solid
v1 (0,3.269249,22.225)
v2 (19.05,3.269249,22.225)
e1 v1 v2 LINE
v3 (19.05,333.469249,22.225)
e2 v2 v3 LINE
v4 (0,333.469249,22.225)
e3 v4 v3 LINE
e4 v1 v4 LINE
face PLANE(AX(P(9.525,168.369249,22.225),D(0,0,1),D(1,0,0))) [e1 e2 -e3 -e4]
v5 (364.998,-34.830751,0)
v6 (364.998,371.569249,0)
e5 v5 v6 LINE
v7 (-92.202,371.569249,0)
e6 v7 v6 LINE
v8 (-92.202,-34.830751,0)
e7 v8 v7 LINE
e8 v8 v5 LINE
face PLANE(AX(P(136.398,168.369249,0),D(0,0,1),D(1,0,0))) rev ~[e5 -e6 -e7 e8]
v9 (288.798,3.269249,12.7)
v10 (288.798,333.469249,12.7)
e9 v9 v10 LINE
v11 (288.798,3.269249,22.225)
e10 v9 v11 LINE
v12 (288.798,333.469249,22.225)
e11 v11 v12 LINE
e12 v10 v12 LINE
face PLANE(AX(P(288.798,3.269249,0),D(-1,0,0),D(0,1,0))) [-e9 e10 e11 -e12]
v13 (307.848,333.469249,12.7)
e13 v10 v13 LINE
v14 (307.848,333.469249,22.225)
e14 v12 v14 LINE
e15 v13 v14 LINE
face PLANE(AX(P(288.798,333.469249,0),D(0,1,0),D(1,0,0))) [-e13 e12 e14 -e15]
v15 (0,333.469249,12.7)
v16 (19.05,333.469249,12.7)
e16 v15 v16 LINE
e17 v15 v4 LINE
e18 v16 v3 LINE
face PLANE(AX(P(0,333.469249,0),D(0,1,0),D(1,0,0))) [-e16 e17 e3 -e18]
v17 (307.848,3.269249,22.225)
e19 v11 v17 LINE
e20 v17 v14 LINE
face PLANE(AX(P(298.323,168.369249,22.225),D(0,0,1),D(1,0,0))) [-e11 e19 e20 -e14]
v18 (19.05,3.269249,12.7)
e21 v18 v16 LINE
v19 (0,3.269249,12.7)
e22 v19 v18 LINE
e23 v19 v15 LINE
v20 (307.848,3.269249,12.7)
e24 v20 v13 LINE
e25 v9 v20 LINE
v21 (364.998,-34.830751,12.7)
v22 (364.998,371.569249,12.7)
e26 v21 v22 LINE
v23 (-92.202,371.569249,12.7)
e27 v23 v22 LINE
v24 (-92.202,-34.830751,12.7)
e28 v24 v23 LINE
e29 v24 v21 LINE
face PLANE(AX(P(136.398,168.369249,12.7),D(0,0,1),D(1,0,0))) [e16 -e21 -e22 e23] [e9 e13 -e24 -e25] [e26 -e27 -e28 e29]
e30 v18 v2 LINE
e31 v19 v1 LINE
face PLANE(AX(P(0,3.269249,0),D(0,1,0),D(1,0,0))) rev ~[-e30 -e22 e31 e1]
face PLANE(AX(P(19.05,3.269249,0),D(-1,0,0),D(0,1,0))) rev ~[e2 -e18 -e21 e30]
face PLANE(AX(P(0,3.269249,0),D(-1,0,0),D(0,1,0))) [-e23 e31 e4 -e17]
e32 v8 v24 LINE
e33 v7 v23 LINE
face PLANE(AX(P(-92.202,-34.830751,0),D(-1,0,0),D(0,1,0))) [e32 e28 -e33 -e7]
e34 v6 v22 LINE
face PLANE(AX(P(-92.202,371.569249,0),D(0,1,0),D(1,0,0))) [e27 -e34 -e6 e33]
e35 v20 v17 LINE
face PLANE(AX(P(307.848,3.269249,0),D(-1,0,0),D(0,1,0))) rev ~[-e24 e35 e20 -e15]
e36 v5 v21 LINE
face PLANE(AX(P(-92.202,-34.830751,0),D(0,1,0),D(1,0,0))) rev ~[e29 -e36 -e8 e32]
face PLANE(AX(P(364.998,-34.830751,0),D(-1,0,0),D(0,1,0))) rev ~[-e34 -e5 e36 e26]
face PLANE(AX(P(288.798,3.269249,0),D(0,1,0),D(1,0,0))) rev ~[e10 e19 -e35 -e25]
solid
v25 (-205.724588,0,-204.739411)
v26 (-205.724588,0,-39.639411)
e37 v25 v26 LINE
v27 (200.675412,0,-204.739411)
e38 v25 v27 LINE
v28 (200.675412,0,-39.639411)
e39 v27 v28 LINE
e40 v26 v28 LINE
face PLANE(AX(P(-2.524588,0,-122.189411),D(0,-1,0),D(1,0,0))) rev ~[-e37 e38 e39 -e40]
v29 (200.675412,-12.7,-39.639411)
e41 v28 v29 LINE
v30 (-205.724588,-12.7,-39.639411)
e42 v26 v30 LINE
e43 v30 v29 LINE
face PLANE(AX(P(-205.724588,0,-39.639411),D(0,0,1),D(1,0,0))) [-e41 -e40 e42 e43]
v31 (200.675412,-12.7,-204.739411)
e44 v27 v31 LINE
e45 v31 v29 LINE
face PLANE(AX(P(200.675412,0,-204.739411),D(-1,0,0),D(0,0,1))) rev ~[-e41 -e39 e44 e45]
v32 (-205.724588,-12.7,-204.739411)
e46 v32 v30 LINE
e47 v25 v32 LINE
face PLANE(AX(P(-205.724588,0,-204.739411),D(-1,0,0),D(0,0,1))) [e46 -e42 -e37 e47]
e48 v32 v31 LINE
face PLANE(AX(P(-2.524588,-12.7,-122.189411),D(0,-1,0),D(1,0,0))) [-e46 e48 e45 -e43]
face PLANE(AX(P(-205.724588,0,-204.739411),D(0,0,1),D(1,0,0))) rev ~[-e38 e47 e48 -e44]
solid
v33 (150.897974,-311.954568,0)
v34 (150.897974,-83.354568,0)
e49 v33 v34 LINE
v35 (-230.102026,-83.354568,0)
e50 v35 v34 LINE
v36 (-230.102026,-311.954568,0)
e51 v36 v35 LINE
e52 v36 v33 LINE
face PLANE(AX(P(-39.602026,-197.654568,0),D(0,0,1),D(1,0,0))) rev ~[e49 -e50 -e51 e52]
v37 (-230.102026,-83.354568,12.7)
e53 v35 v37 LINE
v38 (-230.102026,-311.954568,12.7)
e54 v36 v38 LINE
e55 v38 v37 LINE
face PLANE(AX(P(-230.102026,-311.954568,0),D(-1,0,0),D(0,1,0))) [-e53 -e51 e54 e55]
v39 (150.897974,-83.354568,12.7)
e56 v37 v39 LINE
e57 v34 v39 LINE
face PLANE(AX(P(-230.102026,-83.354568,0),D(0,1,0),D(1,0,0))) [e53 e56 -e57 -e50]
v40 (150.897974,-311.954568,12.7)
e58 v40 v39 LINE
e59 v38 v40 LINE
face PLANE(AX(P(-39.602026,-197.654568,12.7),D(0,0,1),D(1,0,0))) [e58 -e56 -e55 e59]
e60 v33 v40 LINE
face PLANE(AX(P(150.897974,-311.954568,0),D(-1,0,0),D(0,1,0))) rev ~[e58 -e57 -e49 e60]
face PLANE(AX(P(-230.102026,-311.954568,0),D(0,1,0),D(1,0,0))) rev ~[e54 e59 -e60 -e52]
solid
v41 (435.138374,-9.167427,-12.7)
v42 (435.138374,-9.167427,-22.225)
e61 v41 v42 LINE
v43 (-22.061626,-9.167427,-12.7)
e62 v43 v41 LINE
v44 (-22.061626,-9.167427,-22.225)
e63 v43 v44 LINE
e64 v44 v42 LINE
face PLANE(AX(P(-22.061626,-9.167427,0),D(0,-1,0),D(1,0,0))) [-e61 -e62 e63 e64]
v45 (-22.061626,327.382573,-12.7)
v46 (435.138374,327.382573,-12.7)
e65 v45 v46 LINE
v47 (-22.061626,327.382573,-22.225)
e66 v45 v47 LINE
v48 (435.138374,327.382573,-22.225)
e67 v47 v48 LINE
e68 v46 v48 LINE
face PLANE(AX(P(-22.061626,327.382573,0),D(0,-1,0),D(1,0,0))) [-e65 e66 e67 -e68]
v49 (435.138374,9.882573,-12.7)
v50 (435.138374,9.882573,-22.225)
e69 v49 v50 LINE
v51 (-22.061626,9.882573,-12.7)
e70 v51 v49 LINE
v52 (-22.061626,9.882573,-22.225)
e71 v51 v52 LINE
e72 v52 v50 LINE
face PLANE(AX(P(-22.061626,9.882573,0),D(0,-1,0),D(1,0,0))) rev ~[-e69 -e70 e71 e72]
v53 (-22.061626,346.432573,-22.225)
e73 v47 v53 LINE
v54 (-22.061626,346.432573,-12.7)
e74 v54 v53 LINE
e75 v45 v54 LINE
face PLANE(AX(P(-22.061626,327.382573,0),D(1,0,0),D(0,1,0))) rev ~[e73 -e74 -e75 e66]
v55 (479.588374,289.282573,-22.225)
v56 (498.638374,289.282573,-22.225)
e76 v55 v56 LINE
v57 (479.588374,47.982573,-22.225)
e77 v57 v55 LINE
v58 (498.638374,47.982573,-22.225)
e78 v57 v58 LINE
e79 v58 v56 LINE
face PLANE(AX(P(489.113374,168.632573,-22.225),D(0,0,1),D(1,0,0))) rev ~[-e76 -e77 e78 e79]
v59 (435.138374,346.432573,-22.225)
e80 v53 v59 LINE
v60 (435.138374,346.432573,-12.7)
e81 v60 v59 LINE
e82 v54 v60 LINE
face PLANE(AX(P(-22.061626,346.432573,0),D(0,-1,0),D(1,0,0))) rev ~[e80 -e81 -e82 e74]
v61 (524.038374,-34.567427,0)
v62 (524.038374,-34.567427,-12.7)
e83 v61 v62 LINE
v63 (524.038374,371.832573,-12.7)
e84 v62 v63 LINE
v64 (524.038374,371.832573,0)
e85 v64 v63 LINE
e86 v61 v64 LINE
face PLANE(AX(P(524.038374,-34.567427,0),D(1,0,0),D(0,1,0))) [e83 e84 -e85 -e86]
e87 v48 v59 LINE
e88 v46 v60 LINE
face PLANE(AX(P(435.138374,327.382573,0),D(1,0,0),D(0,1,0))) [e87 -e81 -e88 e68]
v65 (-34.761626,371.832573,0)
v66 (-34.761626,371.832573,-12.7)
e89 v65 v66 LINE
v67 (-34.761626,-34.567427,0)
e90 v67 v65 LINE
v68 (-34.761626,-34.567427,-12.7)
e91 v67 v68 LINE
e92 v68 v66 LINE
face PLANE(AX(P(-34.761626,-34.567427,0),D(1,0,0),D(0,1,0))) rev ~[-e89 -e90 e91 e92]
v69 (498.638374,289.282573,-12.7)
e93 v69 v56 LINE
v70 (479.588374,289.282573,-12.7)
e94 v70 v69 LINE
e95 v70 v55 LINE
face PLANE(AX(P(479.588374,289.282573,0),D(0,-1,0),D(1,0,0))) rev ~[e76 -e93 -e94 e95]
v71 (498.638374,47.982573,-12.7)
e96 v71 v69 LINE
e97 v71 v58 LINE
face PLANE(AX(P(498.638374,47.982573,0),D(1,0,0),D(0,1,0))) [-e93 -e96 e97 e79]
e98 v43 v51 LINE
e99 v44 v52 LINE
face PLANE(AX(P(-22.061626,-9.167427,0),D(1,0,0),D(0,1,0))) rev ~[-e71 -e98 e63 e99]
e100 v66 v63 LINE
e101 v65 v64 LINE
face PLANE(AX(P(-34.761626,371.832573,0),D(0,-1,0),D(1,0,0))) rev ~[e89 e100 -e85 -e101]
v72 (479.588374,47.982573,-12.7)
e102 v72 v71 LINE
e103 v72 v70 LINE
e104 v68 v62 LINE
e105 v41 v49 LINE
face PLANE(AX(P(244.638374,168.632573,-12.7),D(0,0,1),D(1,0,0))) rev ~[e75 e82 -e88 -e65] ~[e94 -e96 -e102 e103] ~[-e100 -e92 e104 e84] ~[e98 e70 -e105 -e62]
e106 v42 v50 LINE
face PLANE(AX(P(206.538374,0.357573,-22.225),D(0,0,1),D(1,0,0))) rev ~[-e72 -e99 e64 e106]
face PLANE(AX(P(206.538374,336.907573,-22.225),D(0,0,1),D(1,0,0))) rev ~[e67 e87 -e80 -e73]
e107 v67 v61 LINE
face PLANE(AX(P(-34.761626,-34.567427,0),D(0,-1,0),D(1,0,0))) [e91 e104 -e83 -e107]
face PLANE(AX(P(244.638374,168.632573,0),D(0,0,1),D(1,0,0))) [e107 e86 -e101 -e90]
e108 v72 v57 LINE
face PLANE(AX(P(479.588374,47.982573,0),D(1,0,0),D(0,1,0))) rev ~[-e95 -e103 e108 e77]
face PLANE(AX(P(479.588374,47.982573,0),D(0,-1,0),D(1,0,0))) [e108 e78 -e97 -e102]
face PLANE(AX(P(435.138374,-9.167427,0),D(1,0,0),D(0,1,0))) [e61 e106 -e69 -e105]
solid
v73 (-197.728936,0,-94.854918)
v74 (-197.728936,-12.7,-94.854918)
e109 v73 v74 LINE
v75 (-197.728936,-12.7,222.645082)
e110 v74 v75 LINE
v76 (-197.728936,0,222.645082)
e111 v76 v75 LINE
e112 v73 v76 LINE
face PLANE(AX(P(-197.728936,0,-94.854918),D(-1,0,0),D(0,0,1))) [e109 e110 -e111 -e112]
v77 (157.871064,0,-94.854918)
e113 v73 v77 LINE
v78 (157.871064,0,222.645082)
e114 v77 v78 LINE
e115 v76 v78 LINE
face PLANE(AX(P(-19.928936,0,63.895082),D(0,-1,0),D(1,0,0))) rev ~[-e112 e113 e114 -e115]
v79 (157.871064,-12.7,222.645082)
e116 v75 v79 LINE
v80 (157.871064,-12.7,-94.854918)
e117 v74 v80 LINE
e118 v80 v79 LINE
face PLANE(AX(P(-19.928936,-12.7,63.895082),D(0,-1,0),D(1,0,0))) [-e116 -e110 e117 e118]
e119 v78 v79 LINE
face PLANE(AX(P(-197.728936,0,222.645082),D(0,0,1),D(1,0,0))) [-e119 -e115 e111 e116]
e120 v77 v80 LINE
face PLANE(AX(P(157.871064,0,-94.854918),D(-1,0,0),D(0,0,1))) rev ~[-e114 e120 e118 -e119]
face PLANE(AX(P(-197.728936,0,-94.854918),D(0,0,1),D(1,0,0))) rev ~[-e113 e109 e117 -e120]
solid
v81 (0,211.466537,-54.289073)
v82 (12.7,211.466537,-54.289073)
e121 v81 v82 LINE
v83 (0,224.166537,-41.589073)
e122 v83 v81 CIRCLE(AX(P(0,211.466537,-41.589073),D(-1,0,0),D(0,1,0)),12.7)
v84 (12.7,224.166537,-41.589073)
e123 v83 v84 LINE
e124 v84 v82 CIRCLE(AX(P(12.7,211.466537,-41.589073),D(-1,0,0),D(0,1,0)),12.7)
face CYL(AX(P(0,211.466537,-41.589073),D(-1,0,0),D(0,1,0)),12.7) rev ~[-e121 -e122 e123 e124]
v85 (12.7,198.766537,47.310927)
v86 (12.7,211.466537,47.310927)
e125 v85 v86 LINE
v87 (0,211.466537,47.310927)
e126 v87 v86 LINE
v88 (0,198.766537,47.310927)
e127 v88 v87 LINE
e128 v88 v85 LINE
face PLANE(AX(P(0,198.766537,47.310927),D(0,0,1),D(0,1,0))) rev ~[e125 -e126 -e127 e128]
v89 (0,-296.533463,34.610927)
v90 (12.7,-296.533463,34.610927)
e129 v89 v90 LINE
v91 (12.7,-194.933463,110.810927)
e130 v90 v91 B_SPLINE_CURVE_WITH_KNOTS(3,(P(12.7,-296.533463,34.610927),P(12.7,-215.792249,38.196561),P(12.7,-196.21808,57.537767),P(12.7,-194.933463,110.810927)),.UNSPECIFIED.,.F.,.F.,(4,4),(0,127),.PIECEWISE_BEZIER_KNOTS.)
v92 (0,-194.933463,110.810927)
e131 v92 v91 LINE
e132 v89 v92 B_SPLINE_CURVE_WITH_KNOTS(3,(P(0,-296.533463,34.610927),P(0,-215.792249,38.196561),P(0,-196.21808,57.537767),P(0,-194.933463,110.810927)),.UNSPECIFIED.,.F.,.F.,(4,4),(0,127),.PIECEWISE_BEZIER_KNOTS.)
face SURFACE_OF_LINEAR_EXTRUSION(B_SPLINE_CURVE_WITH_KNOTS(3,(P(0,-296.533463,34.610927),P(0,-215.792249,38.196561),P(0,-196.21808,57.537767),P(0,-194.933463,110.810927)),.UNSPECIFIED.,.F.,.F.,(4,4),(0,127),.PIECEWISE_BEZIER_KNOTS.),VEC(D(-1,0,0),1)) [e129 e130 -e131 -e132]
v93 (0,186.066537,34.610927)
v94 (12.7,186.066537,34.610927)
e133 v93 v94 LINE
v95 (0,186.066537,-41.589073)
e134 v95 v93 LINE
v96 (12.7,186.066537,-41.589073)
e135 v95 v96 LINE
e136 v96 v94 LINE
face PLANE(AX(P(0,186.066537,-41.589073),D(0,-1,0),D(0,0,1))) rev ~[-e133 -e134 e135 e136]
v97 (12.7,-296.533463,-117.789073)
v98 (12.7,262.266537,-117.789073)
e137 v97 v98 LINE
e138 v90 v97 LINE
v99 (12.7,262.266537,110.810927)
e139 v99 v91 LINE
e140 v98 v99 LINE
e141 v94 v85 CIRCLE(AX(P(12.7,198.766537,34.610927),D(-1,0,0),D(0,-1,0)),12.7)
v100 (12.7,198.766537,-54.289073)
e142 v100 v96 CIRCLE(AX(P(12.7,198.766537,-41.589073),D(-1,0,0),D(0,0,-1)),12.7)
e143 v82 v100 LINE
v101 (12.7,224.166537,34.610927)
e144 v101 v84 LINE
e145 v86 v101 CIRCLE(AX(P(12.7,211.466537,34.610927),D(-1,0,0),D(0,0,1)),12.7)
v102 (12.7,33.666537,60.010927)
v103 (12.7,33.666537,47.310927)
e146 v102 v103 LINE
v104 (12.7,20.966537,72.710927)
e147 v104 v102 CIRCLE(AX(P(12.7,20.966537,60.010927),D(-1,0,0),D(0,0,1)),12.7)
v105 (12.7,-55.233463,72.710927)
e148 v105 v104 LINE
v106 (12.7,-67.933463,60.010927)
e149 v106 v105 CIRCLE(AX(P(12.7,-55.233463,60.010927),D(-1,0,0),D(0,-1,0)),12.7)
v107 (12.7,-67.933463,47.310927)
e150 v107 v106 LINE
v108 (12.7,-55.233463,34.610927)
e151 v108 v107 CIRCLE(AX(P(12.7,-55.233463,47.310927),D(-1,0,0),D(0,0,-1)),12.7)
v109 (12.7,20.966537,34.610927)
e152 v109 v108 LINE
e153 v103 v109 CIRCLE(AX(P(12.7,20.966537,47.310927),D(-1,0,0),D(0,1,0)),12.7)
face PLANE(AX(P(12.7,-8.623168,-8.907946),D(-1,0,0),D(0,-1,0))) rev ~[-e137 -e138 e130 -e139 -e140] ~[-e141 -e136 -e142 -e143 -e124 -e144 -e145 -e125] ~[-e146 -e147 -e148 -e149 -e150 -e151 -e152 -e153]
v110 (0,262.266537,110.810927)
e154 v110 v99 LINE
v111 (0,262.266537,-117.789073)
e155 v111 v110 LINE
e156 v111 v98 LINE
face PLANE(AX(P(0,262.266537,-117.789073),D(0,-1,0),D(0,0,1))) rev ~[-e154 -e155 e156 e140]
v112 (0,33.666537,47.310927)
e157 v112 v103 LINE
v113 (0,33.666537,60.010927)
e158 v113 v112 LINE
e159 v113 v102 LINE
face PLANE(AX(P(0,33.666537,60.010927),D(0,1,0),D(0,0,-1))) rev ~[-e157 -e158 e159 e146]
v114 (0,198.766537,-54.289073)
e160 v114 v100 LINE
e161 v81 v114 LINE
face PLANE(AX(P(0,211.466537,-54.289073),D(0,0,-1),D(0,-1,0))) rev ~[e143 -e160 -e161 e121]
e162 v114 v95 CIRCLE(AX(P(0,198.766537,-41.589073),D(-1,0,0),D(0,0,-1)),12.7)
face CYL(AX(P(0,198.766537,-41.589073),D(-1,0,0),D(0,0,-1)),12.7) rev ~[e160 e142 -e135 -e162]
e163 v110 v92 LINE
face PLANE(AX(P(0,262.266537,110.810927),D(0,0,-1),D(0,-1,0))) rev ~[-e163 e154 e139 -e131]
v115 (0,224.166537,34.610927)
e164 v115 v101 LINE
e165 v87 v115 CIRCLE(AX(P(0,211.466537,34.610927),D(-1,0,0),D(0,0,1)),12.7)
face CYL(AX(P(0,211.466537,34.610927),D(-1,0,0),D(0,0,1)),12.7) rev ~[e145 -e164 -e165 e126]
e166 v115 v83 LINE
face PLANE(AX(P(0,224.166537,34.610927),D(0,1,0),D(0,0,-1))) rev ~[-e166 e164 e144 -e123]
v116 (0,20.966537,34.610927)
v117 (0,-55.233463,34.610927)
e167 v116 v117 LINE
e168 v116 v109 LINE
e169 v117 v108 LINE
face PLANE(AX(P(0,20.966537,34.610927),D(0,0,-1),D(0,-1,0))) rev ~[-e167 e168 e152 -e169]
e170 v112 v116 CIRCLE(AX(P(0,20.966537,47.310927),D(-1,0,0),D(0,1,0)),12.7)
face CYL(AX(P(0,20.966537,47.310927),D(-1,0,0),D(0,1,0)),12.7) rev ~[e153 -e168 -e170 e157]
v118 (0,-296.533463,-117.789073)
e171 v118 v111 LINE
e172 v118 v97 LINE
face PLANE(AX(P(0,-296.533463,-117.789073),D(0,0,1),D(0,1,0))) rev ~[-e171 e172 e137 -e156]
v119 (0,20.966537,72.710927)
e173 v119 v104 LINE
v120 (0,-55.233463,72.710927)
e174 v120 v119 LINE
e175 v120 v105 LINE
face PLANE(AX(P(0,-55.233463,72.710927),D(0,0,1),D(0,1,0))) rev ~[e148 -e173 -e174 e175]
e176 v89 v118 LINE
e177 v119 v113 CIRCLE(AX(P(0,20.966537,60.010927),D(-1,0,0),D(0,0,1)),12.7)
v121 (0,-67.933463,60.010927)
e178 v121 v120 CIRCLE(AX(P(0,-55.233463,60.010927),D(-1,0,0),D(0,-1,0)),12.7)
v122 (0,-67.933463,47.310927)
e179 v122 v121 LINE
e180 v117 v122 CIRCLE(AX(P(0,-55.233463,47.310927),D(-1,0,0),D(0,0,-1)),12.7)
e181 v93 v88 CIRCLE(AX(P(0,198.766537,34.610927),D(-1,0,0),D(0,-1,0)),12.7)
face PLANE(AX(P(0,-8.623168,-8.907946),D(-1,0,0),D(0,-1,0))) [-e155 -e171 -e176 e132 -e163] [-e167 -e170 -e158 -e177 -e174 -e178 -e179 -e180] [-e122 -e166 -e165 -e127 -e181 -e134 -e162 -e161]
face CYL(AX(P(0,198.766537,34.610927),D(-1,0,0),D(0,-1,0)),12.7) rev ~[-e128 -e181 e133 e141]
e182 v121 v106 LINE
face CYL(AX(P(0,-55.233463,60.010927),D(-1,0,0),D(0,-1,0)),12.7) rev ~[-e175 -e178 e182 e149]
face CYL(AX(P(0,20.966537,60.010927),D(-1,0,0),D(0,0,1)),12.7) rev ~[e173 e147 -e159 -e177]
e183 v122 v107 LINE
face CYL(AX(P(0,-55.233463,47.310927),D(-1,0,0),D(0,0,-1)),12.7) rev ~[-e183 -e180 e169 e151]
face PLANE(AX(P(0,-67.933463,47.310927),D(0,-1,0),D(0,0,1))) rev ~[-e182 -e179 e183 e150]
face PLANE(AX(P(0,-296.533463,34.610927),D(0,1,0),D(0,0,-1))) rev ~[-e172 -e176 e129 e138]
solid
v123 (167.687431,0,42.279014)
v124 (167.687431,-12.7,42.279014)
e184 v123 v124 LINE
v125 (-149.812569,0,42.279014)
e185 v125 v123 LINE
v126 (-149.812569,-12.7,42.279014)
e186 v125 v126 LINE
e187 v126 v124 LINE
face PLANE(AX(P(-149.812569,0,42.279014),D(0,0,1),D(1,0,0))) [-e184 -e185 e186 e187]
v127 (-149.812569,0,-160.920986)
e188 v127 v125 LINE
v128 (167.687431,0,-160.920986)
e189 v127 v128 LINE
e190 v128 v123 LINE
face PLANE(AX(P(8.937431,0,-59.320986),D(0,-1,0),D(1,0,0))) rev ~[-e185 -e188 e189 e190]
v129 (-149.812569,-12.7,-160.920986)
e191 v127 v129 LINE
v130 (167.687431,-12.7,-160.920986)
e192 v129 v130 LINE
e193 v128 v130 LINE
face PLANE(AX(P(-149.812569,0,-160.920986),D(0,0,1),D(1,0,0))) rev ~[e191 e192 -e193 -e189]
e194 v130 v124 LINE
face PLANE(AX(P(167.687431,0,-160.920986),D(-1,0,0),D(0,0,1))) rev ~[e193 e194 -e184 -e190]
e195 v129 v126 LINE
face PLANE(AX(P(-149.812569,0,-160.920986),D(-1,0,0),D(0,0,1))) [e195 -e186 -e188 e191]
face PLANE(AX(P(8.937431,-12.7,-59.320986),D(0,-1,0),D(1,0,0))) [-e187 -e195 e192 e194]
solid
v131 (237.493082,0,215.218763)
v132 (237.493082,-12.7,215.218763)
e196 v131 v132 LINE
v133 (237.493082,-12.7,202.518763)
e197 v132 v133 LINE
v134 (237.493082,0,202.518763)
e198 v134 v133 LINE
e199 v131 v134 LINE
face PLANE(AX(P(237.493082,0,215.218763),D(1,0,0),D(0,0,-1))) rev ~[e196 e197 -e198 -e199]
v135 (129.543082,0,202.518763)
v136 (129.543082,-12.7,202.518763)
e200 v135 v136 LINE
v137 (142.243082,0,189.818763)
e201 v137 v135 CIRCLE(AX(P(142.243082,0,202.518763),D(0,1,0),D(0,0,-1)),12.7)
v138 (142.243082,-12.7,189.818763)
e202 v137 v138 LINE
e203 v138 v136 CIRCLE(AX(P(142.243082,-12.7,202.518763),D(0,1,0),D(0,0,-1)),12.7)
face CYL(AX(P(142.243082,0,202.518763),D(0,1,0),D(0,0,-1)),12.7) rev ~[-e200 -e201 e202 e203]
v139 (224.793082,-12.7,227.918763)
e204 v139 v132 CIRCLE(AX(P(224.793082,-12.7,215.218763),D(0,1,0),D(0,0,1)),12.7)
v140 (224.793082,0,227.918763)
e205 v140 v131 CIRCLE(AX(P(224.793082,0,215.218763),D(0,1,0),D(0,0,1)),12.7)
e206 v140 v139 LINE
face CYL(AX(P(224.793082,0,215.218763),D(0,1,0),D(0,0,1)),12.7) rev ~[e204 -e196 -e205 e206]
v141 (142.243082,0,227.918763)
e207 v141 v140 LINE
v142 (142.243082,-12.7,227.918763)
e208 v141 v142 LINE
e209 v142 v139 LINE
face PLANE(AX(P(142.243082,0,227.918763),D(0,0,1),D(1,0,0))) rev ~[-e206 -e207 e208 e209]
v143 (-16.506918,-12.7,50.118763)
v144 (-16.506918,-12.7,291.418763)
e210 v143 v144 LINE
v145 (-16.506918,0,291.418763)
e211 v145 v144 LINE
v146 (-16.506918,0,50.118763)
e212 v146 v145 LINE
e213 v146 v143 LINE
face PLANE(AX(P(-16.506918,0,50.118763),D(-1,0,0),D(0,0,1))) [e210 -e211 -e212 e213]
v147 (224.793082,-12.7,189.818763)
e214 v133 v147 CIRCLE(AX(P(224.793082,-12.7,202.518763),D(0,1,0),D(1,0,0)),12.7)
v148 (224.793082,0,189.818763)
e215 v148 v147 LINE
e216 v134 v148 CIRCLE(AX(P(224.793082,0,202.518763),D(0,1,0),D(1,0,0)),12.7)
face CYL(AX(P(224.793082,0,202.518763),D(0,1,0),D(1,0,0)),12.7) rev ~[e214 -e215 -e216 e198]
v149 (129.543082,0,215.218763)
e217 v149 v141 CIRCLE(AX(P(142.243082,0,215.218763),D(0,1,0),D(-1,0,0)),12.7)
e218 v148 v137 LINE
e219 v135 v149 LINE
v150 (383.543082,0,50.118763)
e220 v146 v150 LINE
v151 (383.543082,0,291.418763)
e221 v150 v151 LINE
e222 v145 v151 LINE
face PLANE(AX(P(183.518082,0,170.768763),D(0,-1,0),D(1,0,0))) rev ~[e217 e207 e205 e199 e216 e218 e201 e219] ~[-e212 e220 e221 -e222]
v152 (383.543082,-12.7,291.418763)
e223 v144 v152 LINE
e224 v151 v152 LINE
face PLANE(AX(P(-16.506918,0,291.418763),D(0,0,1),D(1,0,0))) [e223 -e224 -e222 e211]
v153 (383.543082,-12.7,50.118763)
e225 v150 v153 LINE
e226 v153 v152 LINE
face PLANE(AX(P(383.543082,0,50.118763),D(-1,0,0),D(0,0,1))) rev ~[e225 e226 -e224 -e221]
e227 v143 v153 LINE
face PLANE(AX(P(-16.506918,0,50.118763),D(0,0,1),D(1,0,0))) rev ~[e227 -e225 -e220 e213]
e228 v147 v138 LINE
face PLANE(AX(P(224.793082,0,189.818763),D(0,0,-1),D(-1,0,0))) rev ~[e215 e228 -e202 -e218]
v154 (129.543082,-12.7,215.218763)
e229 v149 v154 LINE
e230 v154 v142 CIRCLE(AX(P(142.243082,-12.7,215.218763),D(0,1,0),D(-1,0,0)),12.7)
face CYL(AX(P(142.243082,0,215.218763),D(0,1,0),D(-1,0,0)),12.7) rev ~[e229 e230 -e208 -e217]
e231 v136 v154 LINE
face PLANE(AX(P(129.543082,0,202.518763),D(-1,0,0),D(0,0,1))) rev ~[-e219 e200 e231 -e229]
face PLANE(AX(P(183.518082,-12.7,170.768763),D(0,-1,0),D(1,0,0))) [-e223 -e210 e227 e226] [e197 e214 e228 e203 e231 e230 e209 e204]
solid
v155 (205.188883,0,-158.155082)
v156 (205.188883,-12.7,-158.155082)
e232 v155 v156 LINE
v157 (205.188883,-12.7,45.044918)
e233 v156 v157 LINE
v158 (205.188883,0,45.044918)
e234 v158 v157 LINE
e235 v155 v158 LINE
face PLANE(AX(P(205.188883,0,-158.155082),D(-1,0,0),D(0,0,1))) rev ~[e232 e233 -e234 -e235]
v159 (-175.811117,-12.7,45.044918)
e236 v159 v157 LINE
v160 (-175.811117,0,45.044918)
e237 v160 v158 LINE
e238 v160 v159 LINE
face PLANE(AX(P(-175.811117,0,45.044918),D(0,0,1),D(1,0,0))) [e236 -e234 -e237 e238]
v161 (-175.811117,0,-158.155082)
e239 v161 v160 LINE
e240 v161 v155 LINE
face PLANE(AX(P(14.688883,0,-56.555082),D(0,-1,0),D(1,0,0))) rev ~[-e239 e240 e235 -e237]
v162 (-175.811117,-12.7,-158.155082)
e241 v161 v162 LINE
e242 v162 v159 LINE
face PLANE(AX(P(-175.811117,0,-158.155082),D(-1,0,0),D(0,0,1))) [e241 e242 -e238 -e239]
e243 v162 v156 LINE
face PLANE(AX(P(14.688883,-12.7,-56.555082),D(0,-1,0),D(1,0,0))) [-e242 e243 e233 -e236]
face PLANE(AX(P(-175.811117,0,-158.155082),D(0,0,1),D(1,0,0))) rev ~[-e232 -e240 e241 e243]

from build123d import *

# Parameters (mm, degrees)
F0_W      = 558.8
F0_H      = 406.4
F0_W_2    = 457.2
F0_H_2    = 19.05
F0_W_3    = 19.05
F0_H_3    = 241.3
F1_DEPTH  = 12.7
F2_DEPTH  = 22.225
F3_DEPTH  = 22.225
F4_DEPTH  = 22.225
F5_W      = 457.2
F5_H      = 406.4
F5_W_2    = 19.05
F5_H_2    = 330.2
F6_DEPTH  = 12.7
F7_DEPTH  = 22.225
F8_DEPTH  = 22.225
F9_W      = 406.4
F9_H      = 165.1
F10_DEPTH = 12.7
F12_DEPTH = 12.7
F13_W     = 381
F13_H     = 228.6
F14_DEPTH = 12.7
F15_W     = 400.05
F15_H     = 241.3
F16_DEPTH = 12.7
F17_W     = 317.5
F17_H     = 203.2
F18_DEPTH = 12.7
F19_W     = 381
F19_H     = 203.2
F20_DEPTH = 12.7
F21_W     = 355.6
F21_H     = 317.5
F22_DEPTH = 12.7


with BuildPart() as f1:
    # F0 (on Top) → F1 (new body)
    with BuildSketch(Plane.XY):
        with Locations((244.6383737266, 168.6325731099)):
            Rectangle(F0_W, F0_H)
        with Locations((206.5383737266, 0.3575731099)):
            Rectangle(F0_W_2, F0_H_2, mode=Mode.SUBTRACT)
        with Locations((206.5383737266, 336.9075731099)):
            Rectangle(F0_W_2, F0_H_2, mode=Mode.SUBTRACT)
        with Locations((489.1133737266, 168.6325731099)):
            Rectangle(F0_W_3, F0_H_3, mode=Mode.SUBTRACT)
    extrude(amount=-F1_DEPTH)

    # F0 (on Top) → F2 (join)
    with BuildSketch(Plane.XY):
        with Locations((206.5383737266, 336.9075731099)):
            Rectangle(F0_W_2, F0_H_2)
    extrude(amount=-F2_DEPTH)

    # F0 (on Top) → F3 (join)
    with BuildSketch(Plane.XY):
        with Locations((489.1133737266, 168.6325731099)):
            Rectangle(F0_W_3, F0_H_3)
    extrude(amount=-F3_DEPTH)

    # F0 (on Top) → F4 (join)
    with BuildSketch(Plane.XY):
        with Locations((206.5383737266, 0.3575731099)):
            Rectangle(F0_W_2, F0_H_2)
    extrude(amount=-F4_DEPTH)


with BuildPart() as f6:
    # F5 (on Top) → F6 (new body)
    with BuildSketch(Plane.XY):
        with Locations((136.398, 168.3692485094)):
            Rectangle(F5_W, F5_H)
        with Locations((9.525, 168.3692485094)):
            Rectangle(F5_W_2, F5_H_2, mode=Mode.SUBTRACT)
        with Locations((298.323, 168.3692485094)):
            Rectangle(F5_W_2, F5_H_2, mode=Mode.SUBTRACT)
    extrude(amount=F6_DEPTH)

    # F5 (on Top) → F7 (join)
    with BuildSketch(Plane.XY):
        with Locations((9.525, 168.3692485094)):
            Rectangle(F5_W_2, F5_H_2)
    extrude(amount=F7_DEPTH)

    # F5 (on Top) → F8 (join)
    with BuildSketch(Plane.XY):
        with Locations((298.323, 168.3692485094)):
            Rectangle(F5_W_2, F5_H_2)
    extrude(amount=F8_DEPTH)


with BuildPart() as f10:
    # F9 (on Front) → F10 (new body)
    with BuildSketch(Plane.XZ):
        with Locations((-2.5245882571, -122.1894112668)):
            Rectangle(F9_W, F9_H)
    extrude(amount=F10_DEPTH)


with BuildPart() as f12:
    # F11 (on Right) → F12 (new body)
    with BuildSketch(Plane.YZ):
        with BuildLine():
            Line((-106.0334625381, 110.8109265052), (-194.9334625381, 110.8109265052))
            add(Edge.make_bspline(
                [(-296.5334625381, 34.6109265052), (-215.7922492521, 38.1965605335), (-196.2180797117, 57.5377674894), (-194.9334625381, 110.8109265052)],
                knots=[0, 0, 0, 0, 127, 127, 127, 127], degree=3))
            Line((-296.5334625381, 34.6109265052), (-296.5334625381, -117.7890734948))
            Line((-296.5334625381, -117.7890734948), (-283.8334625381, -117.7890734948))
            Line((-283.8334625381, -117.7890734948), (173.3665374619, -117.7890734948))
            Line((173.3665374619, -117.7890734948), (217.8165374619, -117.7890734948))
            Line((217.8165374619, -117.7890734948), (236.8665374619, -117.7890734948))
            Line((236.8665374619, -117.7890734948), (262.2665374619, -117.7890734948))
            Line((262.2665374619, -117.7890734948), (262.2665374619, 110.8109265052))
            Line((262.2665374619, 110.8109265052), (205.1165374619, 110.8109265052))
            Line((205.1165374619, 110.8109265052), (186.0665374619, 110.8109265052))
            Line((186.0665374619, 110.8109265052), (-86.9834625381, 110.8109265052))
            Line((-86.9834625381, 110.8109265052), (-106.0334625381, 110.8109265052))
        make_face()
        with BuildLine():
            ThreePointArc((-67.9334625381, 60.0109265052), (-64.2137186591, 68.9911826263), (-55.2334625381, 72.7109265052))
            Line((-55.2334625381, 72.7109265052), (20.9665374619, 72.7109265052))
            ThreePointArc((20.9665374619, 72.7109265052), (29.946793583, 68.9911826263), (33.6665374619, 60.0109265052))
            Line((33.6665374619, 60.0109265052), (33.6665374619, 47.3109265052))
            ThreePointArc((33.6665374619, 47.3109265052), (29.946793583, 38.3306703841), (20.9665374619, 34.6109265052))
            Line((20.9665374619, 34.6109265052), (-55.2334625381, 34.6109265052))
            ThreePointArc((-55.2334625381, 34.6109265052), (-64.2137186591, 38.3306703841), (-67.9334625381, 47.3109265052))
            Line((-67.9334625381, 47.3109265052), (-67.9334625381, 60.0109265052))
        make_face(mode=Mode.SUBTRACT)
        with BuildLine():
            ThreePointArc((186.0665374619, 34.6109265052), (189.7862813409, 43.5911826263), (198.7665374619, 47.3109265052))
            Line((198.7665374619, 47.3109265052), (211.4665374619, 47.3109265052))
            ThreePointArc((211.4665374619, 47.3109265052), (220.446793583, 43.5911826263), (224.1665374619, 34.6109265052))
            Line((224.1665374619, 34.6109265052), (224.1665374619, -41.5890734948))
            ThreePointArc((224.1665374619, -41.5890734948), (220.446793583, -50.5693296159), (211.4665374619, -54.2890734948))
            Line((211.4665374619, -54.2890734948), (198.7665374619, -54.2890734948))
            ThreePointArc((198.7665374619, -54.2890734948), (189.7862813409, -50.5693296159), (186.0665374619, -41.5890734948))
            Line((186.0665374619, -41.5890734948), (186.0665374619, 34.6109265052))
        make_face(mode=Mode.SUBTRACT)
    extrude(amount=F12_DEPTH)


with BuildPart() as f14:
    # F13 (on Top) → F14 (new body)
    with BuildSketch(Plane.XY):
        with Locations((-39.6020258009, -197.6545680389)):
            Rectangle(F13_W, F13_H)
    extrude(amount=F14_DEPTH)


with BuildPart() as f16:
    # F15 (on Front) → F16 (new body)
    with BuildSketch(Plane.XZ):
        with Locations((183.5180822253, 170.7687626004)):
            Rectangle(F15_W, F15_H)
        with BuildLine():
            ThreePointArc((129.5430822253, 215.2187626004), (133.2628261043, 224.1990187215), (142.2430822253, 227.9187626004))
            Line((142.2430822253, 227.9187626004), (224.7930822253, 227.9187626004))
            ThreePointArc((224.7930822253, 227.9187626004), (233.7733383464, 224.1990187215), (237.4930822253, 215.2187626004))
            Line((237.4930822253, 215.2187626004), (237.4930822253, 202.5187626004))
            ThreePointArc((237.4930822253, 202.5187626004), (233.7733383464, 193.5385064794), (224.7930822253, 189.8187626004))
            Line((224.7930822253, 189.8187626004), (142.2430822253, 189.8187626004))
            ThreePointArc((142.2430822253, 189.8187626004), (133.2628261043, 193.5385064794), (129.5430822253, 202.5187626004))
            Line((129.5430822253, 202.5187626004), (129.5430822253, 215.2187626004))
        make_face(mode=Mode.SUBTRACT)
    extrude(amount=F16_DEPTH)


with BuildPart() as f18:
    # F17 (on Front) → F18 (new body)
    with BuildSketch(Plane.XZ):
        with Locations((8.9374314994, -59.3209858673)):
            Rectangle(F17_W, F17_H)
    extrude(amount=F18_DEPTH)


with BuildPart() as f20:
    # F19 (on Front) → F20 (new body)
    with BuildSketch(Plane.XZ):
        with Locations((14.6888829768, -56.5550823708)):
            Rectangle(F19_W, F19_H)
    extrude(amount=F20_DEPTH)


with BuildPart() as f22:
    # F21 (on Front) → F22 (new body)
    with BuildSketch(Plane.XZ):
        with Locations((-19.9289359152, 63.8950824002)):
            Rectangle(F21_W, F21_H)
    extrude(amount=F22_DEPTH)


solid = Compound([f1.part, f6.part, f10.part, f12.part, f14.part, f16.part, f18.part, f20.part, f22.part])
